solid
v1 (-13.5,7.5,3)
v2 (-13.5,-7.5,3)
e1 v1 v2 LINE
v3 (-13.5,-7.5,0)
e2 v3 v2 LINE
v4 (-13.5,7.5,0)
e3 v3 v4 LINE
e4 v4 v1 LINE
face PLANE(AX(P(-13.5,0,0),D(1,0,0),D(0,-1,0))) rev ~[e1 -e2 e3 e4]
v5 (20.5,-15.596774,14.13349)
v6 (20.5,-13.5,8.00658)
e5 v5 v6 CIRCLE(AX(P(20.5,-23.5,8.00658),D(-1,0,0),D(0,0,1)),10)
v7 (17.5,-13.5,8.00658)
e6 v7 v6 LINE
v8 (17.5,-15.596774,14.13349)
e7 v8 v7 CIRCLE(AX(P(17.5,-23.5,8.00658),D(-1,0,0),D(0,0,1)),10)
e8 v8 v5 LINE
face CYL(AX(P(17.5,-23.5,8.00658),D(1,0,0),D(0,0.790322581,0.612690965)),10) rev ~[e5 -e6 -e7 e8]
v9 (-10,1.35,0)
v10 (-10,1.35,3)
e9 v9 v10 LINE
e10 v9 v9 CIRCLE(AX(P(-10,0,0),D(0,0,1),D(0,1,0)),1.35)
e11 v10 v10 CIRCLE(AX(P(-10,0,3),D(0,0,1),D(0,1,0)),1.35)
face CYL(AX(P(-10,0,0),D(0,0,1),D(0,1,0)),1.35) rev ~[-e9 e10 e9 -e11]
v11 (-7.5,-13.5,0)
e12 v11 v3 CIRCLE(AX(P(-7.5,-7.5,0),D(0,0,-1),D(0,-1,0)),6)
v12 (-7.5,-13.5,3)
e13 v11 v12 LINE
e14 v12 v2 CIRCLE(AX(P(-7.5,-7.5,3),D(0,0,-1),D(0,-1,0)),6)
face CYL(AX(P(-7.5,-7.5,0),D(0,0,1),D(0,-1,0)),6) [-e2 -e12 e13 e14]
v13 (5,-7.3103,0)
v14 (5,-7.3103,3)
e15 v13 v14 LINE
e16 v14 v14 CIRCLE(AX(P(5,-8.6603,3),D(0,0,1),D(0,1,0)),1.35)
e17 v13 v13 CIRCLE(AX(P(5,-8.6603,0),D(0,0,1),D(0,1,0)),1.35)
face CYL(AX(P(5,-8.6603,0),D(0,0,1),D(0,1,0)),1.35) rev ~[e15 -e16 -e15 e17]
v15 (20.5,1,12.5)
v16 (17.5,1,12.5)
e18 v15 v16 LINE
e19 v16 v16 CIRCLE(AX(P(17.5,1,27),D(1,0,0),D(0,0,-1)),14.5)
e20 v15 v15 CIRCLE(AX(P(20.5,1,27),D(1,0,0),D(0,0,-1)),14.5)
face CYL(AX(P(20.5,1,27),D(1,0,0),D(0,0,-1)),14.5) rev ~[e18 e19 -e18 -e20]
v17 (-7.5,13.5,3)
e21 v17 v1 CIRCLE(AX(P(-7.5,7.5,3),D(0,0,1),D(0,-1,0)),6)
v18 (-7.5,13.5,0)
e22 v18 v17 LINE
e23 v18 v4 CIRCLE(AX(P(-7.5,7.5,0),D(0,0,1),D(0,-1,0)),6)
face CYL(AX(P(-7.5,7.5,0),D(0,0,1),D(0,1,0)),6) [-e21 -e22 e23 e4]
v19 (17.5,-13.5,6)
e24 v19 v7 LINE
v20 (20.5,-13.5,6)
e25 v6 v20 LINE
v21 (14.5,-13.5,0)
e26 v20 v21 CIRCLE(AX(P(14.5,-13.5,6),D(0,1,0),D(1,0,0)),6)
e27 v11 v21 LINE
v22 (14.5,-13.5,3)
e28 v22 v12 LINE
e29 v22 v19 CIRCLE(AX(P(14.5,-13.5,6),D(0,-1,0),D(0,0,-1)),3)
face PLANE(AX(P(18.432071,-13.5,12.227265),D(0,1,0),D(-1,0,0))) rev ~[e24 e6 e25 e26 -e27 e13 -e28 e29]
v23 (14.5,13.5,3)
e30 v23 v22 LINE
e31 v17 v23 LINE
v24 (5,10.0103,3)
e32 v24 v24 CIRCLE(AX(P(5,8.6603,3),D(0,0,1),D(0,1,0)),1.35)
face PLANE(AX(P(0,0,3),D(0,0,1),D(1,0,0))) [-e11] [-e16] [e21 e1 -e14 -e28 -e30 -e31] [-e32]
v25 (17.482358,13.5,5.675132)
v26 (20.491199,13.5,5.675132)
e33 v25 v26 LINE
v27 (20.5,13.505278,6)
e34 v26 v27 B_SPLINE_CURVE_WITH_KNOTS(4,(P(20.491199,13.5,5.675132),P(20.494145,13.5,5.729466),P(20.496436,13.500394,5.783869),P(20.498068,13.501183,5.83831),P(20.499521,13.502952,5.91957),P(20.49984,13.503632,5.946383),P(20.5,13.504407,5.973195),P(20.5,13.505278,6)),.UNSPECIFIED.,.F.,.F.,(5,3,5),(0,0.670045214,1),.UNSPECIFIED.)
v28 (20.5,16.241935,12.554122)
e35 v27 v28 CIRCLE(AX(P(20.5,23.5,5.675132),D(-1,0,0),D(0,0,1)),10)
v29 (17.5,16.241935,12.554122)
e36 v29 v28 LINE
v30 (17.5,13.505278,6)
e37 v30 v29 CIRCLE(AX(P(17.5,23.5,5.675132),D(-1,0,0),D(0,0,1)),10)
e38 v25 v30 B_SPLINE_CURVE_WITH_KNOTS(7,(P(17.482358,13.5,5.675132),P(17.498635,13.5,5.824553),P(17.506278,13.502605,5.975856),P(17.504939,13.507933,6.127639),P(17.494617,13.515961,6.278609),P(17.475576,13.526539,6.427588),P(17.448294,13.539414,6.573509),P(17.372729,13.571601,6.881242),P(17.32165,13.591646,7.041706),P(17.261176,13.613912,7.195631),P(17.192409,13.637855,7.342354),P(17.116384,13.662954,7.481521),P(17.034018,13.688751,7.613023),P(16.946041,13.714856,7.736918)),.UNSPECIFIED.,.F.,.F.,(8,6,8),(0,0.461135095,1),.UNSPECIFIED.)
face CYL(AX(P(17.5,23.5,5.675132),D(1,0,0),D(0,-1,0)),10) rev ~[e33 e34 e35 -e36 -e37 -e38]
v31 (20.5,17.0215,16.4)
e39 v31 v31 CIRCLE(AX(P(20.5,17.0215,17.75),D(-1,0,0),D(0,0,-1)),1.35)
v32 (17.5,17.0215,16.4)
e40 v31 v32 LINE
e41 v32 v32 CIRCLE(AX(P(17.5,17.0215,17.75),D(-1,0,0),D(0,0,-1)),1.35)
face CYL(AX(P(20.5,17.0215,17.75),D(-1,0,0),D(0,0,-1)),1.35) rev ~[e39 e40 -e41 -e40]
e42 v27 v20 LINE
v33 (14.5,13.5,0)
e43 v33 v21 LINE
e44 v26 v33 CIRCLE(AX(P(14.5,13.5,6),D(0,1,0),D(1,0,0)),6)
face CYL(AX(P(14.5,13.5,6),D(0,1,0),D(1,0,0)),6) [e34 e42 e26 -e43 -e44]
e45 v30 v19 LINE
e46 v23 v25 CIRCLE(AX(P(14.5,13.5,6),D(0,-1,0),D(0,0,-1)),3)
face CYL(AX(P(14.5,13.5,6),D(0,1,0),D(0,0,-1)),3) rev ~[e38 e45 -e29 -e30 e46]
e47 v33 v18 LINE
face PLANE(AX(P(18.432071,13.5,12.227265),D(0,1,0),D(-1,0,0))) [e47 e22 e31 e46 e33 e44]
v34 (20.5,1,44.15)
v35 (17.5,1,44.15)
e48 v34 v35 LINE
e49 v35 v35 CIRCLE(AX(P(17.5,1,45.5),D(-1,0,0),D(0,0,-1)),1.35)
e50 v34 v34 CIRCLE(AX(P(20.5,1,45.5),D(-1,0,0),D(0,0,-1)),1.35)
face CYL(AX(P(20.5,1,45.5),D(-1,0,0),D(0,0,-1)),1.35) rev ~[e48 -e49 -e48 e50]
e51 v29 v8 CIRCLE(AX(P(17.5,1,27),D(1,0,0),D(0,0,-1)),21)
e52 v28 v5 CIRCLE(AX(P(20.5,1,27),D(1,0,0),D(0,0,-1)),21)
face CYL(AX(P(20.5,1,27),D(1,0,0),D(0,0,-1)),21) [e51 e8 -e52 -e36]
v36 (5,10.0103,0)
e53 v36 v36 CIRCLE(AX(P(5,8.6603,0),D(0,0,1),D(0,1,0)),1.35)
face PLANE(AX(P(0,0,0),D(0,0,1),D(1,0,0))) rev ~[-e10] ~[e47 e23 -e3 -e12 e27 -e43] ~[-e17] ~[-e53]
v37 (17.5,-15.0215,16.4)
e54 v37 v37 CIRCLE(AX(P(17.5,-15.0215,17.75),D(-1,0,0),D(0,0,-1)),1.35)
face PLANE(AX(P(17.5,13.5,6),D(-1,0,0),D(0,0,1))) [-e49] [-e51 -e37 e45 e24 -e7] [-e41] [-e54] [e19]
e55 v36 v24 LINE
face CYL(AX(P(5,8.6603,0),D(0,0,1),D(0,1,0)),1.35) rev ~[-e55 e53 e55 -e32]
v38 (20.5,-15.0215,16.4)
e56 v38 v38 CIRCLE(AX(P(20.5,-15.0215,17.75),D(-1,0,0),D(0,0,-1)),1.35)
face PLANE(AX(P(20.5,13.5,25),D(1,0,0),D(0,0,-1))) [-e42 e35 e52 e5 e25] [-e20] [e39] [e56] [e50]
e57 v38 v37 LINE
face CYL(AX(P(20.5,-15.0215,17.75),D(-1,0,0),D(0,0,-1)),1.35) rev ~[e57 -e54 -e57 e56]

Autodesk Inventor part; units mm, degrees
ref_plane "YZ Plane" through (0, 0, 0) normal (1, 0, 0) x (0, 1, 0)
ref_plane "XZ Plane" through (0, 0, 0) normal (0, 1, 0) x (-1, 0, 0)
ref_plane "XY Plane" through (0, 0, 0) normal (0, 0, 1) x (1, 0, 0)
sketch "スケッチ1" plane through (0, 0, 0) normal (0, 0, 1) x (1, 0, 0)
  circle A0 centre (0, 0) radius 13.5
  line L0 (0, 13.5) -> (14.5, 13.5)
  line L1 (14.5, 13.5) -> (14.5, -13.5)
  line L2 (14.5, -13.5) -> (0, -13.5)
  line L3 (0, -13.5) -> (0, 13.5)
  line L4 (0, 0) -> (14.5, 0) construction
  point P0 (0, 13.5)
  point P1 (0, -13.5)
  point P2 (0, -13.5)
  dimension "d0" = 27
  dimension "d1" = 27
  dimension "d2" = 14.5
extrude "プレート1" add sketch "スケッチ1" along normal blind 3
sketch "スケッチ2" plane through (17.5, 13.5, 6) normal (1, 0, 0) x (0, 1, 0)
  line L0 (-27, 0) -> (0, 0)
  line L1 (0, 0) -> (0, 19)
  line L2 (0, 19) -> (-27, 19)
  line L3 (-27, 19) -> (-27, 0)
edge flange "フランジ1" height 25 angle 90 thickness 3 bend radius 3 thickness toward (1, 0, 0) relief tear relief width 3 relief depth 1.5 edges at (14.5, 0, 3) wall of the first edge with corners at (17.5, -13.5, 6) (17.5, 13.5, 6) (17.5, 13.5, 25) (17.5, -13.5, 25)
bend "曲げ1"
corner "コーナー1"
sketch "スケッチ3" plane through (0, 0, 0) normal (0, 0, -1) x (-1, 0, 0)
  point P0 (0, 0)
  point P1 (10, 0)
  point P2 (-5, 8.6603)
  point P3 (-5, -8.6603)
  dimension "d14" = 10
  dimension "d17" = 360
hole "穴1" at (-10, 0, 0) at (5, 8.6603, 0) at (5, -8.6603, 0) direction (0, 0, 1) diameter 2.7 depth 3
sketch "スケッチ4" plane through (20.5, -13.5, 25) normal (1, 0, 0) x (0, 0, -1)
  circle A0 centre (-2, 14.5) radius 21
  line L0 (25, 27) -> (25, 0) projected
  point P0 (25, 13.5)
  dimension "d26" = 42
  dimension "d29" = 27
extrude "押し出し1" add sketch "スケッチ4" against normal up to surface (3 mm away)
sketch "スケッチ5" plane through (20.5, -13.5, 6) normal (1, 0, 0) x (0, 0, -1)
  arc A0 (-4.1255, 27) -> (-5.8095, 0) centre (-21, 14.5) ccw projected
  circle A1 centre (-21, 14.5) radius 14.5
  point P0 (6, 13.5)
  dimension "d30" = 29
extrude "押し出し2" cut sketch "スケッチ5" against normal up to surface (3 mm away)
sketch "スケッチ7" plane through (20.5, -13.5, 6) normal (1, 0, 0) x (0, 0, -1)
  circle A0 centre (-21, 14.5) radius 14.5 projected
  point P0 (6, 13.5)
  point P1 (-39.5, 14.5)
  point P2 (-11.75, -1.5215)
  point P3 (-11.75, 30.5215)
  dimension "d33" = 18.5
  dimension "d36" = 360
hole "穴2" at (20.5, 1, 45.5) at (20.5, -15.0215, 17.75) at (20.5, 17.0215, 17.75) direction (-1, 0, 0) diameter 2.7 depth 3
fillet "フィレット1" radius 10 2 edges at (19, -13.5, 11.8095) (19, 13.5, 10.1255)
sketch "スケッチ9" plane through (0, 0, 0) normal (0, 0, -1) x (-1, 0, 0)
  arc A0 (0, -13.5) -> (0, 13.5) centre (0, 0) ccw projected
  line L0 (0, 13.5) -> (13.5, 13.5)
  line L1 (13.5, 13.5) -> (13.5, -13.5)
  line L2 (13.5, -13.5) -> (0, -13.5)
  line L3 (0, -13.5) -> (0, 13.5)
  circle A1 centre (-5, -8.6603) radius 1.35 projected
  circle A2 centre (-5, 8.6603) radius 1.35 projected
  circle A3 centre (10, 0) radius 1.35 projected
  line L4 (0, 13.5) -> (-14.5, 13.5) projected
  line L5 (-14.5, 13.5) -> (-14.5, -13.5) projected
  line L6 (-14.5, -13.5) -> (0, -13.5) projected
  arc A4 (0, -13.5) -> (0, 13.5) centre (0, 0) ccw projected
  point P0 (13.5, 0)
  dimension "d48" = 13.5
  dimension "d49" = 27
extrude "押し出し3" add sketch "スケッチ9" against normal up to surface (3 mm away) contours A0 L1 L2 | A0 L0 L1
fillet "フィレット2" radius 6 2 edges at (-13.5, 13.5, 1.5) (-13.5, -13.5, 1.5)
equation "\"d24\" = Thickness"
equation "\"d3\" = Thickness"
equation "\"d4\" = BendReliefWidth"
equation "\"d5\" = BendReliefDepth"
equation "\"d6\" = MinimumRemnant"
equation "\"d7\" = TransitionRadius"
equation "\"d10\" = BendRadius"
equation "\"d11\" = CornerReliefSize"
equation "\"d12\" = GapSize"
equation "\"d13\" = JacobiRadiusSize"
equation "\"BendRadius\" = Thickness"
equation "\"BendReliefWidth\" = Thickness"
equation "\"BendReliefDepth\" = 0.5 * Thickness"
equation "\"CornerReliefSize\" = 4 * Thickness"
equation "\"MinimumRemnant\" = 2 * Thickness"
equation "\"TransitionRadius\" = BendRadius"
equation "\"JacobiRadiusSize\" = BendRadius"
equation "\"GapSize\" = Thickness"
equation "\"Thickness\" = 3"
properties part number "wrist_roll_plate" material "アルミニウム 6061"
